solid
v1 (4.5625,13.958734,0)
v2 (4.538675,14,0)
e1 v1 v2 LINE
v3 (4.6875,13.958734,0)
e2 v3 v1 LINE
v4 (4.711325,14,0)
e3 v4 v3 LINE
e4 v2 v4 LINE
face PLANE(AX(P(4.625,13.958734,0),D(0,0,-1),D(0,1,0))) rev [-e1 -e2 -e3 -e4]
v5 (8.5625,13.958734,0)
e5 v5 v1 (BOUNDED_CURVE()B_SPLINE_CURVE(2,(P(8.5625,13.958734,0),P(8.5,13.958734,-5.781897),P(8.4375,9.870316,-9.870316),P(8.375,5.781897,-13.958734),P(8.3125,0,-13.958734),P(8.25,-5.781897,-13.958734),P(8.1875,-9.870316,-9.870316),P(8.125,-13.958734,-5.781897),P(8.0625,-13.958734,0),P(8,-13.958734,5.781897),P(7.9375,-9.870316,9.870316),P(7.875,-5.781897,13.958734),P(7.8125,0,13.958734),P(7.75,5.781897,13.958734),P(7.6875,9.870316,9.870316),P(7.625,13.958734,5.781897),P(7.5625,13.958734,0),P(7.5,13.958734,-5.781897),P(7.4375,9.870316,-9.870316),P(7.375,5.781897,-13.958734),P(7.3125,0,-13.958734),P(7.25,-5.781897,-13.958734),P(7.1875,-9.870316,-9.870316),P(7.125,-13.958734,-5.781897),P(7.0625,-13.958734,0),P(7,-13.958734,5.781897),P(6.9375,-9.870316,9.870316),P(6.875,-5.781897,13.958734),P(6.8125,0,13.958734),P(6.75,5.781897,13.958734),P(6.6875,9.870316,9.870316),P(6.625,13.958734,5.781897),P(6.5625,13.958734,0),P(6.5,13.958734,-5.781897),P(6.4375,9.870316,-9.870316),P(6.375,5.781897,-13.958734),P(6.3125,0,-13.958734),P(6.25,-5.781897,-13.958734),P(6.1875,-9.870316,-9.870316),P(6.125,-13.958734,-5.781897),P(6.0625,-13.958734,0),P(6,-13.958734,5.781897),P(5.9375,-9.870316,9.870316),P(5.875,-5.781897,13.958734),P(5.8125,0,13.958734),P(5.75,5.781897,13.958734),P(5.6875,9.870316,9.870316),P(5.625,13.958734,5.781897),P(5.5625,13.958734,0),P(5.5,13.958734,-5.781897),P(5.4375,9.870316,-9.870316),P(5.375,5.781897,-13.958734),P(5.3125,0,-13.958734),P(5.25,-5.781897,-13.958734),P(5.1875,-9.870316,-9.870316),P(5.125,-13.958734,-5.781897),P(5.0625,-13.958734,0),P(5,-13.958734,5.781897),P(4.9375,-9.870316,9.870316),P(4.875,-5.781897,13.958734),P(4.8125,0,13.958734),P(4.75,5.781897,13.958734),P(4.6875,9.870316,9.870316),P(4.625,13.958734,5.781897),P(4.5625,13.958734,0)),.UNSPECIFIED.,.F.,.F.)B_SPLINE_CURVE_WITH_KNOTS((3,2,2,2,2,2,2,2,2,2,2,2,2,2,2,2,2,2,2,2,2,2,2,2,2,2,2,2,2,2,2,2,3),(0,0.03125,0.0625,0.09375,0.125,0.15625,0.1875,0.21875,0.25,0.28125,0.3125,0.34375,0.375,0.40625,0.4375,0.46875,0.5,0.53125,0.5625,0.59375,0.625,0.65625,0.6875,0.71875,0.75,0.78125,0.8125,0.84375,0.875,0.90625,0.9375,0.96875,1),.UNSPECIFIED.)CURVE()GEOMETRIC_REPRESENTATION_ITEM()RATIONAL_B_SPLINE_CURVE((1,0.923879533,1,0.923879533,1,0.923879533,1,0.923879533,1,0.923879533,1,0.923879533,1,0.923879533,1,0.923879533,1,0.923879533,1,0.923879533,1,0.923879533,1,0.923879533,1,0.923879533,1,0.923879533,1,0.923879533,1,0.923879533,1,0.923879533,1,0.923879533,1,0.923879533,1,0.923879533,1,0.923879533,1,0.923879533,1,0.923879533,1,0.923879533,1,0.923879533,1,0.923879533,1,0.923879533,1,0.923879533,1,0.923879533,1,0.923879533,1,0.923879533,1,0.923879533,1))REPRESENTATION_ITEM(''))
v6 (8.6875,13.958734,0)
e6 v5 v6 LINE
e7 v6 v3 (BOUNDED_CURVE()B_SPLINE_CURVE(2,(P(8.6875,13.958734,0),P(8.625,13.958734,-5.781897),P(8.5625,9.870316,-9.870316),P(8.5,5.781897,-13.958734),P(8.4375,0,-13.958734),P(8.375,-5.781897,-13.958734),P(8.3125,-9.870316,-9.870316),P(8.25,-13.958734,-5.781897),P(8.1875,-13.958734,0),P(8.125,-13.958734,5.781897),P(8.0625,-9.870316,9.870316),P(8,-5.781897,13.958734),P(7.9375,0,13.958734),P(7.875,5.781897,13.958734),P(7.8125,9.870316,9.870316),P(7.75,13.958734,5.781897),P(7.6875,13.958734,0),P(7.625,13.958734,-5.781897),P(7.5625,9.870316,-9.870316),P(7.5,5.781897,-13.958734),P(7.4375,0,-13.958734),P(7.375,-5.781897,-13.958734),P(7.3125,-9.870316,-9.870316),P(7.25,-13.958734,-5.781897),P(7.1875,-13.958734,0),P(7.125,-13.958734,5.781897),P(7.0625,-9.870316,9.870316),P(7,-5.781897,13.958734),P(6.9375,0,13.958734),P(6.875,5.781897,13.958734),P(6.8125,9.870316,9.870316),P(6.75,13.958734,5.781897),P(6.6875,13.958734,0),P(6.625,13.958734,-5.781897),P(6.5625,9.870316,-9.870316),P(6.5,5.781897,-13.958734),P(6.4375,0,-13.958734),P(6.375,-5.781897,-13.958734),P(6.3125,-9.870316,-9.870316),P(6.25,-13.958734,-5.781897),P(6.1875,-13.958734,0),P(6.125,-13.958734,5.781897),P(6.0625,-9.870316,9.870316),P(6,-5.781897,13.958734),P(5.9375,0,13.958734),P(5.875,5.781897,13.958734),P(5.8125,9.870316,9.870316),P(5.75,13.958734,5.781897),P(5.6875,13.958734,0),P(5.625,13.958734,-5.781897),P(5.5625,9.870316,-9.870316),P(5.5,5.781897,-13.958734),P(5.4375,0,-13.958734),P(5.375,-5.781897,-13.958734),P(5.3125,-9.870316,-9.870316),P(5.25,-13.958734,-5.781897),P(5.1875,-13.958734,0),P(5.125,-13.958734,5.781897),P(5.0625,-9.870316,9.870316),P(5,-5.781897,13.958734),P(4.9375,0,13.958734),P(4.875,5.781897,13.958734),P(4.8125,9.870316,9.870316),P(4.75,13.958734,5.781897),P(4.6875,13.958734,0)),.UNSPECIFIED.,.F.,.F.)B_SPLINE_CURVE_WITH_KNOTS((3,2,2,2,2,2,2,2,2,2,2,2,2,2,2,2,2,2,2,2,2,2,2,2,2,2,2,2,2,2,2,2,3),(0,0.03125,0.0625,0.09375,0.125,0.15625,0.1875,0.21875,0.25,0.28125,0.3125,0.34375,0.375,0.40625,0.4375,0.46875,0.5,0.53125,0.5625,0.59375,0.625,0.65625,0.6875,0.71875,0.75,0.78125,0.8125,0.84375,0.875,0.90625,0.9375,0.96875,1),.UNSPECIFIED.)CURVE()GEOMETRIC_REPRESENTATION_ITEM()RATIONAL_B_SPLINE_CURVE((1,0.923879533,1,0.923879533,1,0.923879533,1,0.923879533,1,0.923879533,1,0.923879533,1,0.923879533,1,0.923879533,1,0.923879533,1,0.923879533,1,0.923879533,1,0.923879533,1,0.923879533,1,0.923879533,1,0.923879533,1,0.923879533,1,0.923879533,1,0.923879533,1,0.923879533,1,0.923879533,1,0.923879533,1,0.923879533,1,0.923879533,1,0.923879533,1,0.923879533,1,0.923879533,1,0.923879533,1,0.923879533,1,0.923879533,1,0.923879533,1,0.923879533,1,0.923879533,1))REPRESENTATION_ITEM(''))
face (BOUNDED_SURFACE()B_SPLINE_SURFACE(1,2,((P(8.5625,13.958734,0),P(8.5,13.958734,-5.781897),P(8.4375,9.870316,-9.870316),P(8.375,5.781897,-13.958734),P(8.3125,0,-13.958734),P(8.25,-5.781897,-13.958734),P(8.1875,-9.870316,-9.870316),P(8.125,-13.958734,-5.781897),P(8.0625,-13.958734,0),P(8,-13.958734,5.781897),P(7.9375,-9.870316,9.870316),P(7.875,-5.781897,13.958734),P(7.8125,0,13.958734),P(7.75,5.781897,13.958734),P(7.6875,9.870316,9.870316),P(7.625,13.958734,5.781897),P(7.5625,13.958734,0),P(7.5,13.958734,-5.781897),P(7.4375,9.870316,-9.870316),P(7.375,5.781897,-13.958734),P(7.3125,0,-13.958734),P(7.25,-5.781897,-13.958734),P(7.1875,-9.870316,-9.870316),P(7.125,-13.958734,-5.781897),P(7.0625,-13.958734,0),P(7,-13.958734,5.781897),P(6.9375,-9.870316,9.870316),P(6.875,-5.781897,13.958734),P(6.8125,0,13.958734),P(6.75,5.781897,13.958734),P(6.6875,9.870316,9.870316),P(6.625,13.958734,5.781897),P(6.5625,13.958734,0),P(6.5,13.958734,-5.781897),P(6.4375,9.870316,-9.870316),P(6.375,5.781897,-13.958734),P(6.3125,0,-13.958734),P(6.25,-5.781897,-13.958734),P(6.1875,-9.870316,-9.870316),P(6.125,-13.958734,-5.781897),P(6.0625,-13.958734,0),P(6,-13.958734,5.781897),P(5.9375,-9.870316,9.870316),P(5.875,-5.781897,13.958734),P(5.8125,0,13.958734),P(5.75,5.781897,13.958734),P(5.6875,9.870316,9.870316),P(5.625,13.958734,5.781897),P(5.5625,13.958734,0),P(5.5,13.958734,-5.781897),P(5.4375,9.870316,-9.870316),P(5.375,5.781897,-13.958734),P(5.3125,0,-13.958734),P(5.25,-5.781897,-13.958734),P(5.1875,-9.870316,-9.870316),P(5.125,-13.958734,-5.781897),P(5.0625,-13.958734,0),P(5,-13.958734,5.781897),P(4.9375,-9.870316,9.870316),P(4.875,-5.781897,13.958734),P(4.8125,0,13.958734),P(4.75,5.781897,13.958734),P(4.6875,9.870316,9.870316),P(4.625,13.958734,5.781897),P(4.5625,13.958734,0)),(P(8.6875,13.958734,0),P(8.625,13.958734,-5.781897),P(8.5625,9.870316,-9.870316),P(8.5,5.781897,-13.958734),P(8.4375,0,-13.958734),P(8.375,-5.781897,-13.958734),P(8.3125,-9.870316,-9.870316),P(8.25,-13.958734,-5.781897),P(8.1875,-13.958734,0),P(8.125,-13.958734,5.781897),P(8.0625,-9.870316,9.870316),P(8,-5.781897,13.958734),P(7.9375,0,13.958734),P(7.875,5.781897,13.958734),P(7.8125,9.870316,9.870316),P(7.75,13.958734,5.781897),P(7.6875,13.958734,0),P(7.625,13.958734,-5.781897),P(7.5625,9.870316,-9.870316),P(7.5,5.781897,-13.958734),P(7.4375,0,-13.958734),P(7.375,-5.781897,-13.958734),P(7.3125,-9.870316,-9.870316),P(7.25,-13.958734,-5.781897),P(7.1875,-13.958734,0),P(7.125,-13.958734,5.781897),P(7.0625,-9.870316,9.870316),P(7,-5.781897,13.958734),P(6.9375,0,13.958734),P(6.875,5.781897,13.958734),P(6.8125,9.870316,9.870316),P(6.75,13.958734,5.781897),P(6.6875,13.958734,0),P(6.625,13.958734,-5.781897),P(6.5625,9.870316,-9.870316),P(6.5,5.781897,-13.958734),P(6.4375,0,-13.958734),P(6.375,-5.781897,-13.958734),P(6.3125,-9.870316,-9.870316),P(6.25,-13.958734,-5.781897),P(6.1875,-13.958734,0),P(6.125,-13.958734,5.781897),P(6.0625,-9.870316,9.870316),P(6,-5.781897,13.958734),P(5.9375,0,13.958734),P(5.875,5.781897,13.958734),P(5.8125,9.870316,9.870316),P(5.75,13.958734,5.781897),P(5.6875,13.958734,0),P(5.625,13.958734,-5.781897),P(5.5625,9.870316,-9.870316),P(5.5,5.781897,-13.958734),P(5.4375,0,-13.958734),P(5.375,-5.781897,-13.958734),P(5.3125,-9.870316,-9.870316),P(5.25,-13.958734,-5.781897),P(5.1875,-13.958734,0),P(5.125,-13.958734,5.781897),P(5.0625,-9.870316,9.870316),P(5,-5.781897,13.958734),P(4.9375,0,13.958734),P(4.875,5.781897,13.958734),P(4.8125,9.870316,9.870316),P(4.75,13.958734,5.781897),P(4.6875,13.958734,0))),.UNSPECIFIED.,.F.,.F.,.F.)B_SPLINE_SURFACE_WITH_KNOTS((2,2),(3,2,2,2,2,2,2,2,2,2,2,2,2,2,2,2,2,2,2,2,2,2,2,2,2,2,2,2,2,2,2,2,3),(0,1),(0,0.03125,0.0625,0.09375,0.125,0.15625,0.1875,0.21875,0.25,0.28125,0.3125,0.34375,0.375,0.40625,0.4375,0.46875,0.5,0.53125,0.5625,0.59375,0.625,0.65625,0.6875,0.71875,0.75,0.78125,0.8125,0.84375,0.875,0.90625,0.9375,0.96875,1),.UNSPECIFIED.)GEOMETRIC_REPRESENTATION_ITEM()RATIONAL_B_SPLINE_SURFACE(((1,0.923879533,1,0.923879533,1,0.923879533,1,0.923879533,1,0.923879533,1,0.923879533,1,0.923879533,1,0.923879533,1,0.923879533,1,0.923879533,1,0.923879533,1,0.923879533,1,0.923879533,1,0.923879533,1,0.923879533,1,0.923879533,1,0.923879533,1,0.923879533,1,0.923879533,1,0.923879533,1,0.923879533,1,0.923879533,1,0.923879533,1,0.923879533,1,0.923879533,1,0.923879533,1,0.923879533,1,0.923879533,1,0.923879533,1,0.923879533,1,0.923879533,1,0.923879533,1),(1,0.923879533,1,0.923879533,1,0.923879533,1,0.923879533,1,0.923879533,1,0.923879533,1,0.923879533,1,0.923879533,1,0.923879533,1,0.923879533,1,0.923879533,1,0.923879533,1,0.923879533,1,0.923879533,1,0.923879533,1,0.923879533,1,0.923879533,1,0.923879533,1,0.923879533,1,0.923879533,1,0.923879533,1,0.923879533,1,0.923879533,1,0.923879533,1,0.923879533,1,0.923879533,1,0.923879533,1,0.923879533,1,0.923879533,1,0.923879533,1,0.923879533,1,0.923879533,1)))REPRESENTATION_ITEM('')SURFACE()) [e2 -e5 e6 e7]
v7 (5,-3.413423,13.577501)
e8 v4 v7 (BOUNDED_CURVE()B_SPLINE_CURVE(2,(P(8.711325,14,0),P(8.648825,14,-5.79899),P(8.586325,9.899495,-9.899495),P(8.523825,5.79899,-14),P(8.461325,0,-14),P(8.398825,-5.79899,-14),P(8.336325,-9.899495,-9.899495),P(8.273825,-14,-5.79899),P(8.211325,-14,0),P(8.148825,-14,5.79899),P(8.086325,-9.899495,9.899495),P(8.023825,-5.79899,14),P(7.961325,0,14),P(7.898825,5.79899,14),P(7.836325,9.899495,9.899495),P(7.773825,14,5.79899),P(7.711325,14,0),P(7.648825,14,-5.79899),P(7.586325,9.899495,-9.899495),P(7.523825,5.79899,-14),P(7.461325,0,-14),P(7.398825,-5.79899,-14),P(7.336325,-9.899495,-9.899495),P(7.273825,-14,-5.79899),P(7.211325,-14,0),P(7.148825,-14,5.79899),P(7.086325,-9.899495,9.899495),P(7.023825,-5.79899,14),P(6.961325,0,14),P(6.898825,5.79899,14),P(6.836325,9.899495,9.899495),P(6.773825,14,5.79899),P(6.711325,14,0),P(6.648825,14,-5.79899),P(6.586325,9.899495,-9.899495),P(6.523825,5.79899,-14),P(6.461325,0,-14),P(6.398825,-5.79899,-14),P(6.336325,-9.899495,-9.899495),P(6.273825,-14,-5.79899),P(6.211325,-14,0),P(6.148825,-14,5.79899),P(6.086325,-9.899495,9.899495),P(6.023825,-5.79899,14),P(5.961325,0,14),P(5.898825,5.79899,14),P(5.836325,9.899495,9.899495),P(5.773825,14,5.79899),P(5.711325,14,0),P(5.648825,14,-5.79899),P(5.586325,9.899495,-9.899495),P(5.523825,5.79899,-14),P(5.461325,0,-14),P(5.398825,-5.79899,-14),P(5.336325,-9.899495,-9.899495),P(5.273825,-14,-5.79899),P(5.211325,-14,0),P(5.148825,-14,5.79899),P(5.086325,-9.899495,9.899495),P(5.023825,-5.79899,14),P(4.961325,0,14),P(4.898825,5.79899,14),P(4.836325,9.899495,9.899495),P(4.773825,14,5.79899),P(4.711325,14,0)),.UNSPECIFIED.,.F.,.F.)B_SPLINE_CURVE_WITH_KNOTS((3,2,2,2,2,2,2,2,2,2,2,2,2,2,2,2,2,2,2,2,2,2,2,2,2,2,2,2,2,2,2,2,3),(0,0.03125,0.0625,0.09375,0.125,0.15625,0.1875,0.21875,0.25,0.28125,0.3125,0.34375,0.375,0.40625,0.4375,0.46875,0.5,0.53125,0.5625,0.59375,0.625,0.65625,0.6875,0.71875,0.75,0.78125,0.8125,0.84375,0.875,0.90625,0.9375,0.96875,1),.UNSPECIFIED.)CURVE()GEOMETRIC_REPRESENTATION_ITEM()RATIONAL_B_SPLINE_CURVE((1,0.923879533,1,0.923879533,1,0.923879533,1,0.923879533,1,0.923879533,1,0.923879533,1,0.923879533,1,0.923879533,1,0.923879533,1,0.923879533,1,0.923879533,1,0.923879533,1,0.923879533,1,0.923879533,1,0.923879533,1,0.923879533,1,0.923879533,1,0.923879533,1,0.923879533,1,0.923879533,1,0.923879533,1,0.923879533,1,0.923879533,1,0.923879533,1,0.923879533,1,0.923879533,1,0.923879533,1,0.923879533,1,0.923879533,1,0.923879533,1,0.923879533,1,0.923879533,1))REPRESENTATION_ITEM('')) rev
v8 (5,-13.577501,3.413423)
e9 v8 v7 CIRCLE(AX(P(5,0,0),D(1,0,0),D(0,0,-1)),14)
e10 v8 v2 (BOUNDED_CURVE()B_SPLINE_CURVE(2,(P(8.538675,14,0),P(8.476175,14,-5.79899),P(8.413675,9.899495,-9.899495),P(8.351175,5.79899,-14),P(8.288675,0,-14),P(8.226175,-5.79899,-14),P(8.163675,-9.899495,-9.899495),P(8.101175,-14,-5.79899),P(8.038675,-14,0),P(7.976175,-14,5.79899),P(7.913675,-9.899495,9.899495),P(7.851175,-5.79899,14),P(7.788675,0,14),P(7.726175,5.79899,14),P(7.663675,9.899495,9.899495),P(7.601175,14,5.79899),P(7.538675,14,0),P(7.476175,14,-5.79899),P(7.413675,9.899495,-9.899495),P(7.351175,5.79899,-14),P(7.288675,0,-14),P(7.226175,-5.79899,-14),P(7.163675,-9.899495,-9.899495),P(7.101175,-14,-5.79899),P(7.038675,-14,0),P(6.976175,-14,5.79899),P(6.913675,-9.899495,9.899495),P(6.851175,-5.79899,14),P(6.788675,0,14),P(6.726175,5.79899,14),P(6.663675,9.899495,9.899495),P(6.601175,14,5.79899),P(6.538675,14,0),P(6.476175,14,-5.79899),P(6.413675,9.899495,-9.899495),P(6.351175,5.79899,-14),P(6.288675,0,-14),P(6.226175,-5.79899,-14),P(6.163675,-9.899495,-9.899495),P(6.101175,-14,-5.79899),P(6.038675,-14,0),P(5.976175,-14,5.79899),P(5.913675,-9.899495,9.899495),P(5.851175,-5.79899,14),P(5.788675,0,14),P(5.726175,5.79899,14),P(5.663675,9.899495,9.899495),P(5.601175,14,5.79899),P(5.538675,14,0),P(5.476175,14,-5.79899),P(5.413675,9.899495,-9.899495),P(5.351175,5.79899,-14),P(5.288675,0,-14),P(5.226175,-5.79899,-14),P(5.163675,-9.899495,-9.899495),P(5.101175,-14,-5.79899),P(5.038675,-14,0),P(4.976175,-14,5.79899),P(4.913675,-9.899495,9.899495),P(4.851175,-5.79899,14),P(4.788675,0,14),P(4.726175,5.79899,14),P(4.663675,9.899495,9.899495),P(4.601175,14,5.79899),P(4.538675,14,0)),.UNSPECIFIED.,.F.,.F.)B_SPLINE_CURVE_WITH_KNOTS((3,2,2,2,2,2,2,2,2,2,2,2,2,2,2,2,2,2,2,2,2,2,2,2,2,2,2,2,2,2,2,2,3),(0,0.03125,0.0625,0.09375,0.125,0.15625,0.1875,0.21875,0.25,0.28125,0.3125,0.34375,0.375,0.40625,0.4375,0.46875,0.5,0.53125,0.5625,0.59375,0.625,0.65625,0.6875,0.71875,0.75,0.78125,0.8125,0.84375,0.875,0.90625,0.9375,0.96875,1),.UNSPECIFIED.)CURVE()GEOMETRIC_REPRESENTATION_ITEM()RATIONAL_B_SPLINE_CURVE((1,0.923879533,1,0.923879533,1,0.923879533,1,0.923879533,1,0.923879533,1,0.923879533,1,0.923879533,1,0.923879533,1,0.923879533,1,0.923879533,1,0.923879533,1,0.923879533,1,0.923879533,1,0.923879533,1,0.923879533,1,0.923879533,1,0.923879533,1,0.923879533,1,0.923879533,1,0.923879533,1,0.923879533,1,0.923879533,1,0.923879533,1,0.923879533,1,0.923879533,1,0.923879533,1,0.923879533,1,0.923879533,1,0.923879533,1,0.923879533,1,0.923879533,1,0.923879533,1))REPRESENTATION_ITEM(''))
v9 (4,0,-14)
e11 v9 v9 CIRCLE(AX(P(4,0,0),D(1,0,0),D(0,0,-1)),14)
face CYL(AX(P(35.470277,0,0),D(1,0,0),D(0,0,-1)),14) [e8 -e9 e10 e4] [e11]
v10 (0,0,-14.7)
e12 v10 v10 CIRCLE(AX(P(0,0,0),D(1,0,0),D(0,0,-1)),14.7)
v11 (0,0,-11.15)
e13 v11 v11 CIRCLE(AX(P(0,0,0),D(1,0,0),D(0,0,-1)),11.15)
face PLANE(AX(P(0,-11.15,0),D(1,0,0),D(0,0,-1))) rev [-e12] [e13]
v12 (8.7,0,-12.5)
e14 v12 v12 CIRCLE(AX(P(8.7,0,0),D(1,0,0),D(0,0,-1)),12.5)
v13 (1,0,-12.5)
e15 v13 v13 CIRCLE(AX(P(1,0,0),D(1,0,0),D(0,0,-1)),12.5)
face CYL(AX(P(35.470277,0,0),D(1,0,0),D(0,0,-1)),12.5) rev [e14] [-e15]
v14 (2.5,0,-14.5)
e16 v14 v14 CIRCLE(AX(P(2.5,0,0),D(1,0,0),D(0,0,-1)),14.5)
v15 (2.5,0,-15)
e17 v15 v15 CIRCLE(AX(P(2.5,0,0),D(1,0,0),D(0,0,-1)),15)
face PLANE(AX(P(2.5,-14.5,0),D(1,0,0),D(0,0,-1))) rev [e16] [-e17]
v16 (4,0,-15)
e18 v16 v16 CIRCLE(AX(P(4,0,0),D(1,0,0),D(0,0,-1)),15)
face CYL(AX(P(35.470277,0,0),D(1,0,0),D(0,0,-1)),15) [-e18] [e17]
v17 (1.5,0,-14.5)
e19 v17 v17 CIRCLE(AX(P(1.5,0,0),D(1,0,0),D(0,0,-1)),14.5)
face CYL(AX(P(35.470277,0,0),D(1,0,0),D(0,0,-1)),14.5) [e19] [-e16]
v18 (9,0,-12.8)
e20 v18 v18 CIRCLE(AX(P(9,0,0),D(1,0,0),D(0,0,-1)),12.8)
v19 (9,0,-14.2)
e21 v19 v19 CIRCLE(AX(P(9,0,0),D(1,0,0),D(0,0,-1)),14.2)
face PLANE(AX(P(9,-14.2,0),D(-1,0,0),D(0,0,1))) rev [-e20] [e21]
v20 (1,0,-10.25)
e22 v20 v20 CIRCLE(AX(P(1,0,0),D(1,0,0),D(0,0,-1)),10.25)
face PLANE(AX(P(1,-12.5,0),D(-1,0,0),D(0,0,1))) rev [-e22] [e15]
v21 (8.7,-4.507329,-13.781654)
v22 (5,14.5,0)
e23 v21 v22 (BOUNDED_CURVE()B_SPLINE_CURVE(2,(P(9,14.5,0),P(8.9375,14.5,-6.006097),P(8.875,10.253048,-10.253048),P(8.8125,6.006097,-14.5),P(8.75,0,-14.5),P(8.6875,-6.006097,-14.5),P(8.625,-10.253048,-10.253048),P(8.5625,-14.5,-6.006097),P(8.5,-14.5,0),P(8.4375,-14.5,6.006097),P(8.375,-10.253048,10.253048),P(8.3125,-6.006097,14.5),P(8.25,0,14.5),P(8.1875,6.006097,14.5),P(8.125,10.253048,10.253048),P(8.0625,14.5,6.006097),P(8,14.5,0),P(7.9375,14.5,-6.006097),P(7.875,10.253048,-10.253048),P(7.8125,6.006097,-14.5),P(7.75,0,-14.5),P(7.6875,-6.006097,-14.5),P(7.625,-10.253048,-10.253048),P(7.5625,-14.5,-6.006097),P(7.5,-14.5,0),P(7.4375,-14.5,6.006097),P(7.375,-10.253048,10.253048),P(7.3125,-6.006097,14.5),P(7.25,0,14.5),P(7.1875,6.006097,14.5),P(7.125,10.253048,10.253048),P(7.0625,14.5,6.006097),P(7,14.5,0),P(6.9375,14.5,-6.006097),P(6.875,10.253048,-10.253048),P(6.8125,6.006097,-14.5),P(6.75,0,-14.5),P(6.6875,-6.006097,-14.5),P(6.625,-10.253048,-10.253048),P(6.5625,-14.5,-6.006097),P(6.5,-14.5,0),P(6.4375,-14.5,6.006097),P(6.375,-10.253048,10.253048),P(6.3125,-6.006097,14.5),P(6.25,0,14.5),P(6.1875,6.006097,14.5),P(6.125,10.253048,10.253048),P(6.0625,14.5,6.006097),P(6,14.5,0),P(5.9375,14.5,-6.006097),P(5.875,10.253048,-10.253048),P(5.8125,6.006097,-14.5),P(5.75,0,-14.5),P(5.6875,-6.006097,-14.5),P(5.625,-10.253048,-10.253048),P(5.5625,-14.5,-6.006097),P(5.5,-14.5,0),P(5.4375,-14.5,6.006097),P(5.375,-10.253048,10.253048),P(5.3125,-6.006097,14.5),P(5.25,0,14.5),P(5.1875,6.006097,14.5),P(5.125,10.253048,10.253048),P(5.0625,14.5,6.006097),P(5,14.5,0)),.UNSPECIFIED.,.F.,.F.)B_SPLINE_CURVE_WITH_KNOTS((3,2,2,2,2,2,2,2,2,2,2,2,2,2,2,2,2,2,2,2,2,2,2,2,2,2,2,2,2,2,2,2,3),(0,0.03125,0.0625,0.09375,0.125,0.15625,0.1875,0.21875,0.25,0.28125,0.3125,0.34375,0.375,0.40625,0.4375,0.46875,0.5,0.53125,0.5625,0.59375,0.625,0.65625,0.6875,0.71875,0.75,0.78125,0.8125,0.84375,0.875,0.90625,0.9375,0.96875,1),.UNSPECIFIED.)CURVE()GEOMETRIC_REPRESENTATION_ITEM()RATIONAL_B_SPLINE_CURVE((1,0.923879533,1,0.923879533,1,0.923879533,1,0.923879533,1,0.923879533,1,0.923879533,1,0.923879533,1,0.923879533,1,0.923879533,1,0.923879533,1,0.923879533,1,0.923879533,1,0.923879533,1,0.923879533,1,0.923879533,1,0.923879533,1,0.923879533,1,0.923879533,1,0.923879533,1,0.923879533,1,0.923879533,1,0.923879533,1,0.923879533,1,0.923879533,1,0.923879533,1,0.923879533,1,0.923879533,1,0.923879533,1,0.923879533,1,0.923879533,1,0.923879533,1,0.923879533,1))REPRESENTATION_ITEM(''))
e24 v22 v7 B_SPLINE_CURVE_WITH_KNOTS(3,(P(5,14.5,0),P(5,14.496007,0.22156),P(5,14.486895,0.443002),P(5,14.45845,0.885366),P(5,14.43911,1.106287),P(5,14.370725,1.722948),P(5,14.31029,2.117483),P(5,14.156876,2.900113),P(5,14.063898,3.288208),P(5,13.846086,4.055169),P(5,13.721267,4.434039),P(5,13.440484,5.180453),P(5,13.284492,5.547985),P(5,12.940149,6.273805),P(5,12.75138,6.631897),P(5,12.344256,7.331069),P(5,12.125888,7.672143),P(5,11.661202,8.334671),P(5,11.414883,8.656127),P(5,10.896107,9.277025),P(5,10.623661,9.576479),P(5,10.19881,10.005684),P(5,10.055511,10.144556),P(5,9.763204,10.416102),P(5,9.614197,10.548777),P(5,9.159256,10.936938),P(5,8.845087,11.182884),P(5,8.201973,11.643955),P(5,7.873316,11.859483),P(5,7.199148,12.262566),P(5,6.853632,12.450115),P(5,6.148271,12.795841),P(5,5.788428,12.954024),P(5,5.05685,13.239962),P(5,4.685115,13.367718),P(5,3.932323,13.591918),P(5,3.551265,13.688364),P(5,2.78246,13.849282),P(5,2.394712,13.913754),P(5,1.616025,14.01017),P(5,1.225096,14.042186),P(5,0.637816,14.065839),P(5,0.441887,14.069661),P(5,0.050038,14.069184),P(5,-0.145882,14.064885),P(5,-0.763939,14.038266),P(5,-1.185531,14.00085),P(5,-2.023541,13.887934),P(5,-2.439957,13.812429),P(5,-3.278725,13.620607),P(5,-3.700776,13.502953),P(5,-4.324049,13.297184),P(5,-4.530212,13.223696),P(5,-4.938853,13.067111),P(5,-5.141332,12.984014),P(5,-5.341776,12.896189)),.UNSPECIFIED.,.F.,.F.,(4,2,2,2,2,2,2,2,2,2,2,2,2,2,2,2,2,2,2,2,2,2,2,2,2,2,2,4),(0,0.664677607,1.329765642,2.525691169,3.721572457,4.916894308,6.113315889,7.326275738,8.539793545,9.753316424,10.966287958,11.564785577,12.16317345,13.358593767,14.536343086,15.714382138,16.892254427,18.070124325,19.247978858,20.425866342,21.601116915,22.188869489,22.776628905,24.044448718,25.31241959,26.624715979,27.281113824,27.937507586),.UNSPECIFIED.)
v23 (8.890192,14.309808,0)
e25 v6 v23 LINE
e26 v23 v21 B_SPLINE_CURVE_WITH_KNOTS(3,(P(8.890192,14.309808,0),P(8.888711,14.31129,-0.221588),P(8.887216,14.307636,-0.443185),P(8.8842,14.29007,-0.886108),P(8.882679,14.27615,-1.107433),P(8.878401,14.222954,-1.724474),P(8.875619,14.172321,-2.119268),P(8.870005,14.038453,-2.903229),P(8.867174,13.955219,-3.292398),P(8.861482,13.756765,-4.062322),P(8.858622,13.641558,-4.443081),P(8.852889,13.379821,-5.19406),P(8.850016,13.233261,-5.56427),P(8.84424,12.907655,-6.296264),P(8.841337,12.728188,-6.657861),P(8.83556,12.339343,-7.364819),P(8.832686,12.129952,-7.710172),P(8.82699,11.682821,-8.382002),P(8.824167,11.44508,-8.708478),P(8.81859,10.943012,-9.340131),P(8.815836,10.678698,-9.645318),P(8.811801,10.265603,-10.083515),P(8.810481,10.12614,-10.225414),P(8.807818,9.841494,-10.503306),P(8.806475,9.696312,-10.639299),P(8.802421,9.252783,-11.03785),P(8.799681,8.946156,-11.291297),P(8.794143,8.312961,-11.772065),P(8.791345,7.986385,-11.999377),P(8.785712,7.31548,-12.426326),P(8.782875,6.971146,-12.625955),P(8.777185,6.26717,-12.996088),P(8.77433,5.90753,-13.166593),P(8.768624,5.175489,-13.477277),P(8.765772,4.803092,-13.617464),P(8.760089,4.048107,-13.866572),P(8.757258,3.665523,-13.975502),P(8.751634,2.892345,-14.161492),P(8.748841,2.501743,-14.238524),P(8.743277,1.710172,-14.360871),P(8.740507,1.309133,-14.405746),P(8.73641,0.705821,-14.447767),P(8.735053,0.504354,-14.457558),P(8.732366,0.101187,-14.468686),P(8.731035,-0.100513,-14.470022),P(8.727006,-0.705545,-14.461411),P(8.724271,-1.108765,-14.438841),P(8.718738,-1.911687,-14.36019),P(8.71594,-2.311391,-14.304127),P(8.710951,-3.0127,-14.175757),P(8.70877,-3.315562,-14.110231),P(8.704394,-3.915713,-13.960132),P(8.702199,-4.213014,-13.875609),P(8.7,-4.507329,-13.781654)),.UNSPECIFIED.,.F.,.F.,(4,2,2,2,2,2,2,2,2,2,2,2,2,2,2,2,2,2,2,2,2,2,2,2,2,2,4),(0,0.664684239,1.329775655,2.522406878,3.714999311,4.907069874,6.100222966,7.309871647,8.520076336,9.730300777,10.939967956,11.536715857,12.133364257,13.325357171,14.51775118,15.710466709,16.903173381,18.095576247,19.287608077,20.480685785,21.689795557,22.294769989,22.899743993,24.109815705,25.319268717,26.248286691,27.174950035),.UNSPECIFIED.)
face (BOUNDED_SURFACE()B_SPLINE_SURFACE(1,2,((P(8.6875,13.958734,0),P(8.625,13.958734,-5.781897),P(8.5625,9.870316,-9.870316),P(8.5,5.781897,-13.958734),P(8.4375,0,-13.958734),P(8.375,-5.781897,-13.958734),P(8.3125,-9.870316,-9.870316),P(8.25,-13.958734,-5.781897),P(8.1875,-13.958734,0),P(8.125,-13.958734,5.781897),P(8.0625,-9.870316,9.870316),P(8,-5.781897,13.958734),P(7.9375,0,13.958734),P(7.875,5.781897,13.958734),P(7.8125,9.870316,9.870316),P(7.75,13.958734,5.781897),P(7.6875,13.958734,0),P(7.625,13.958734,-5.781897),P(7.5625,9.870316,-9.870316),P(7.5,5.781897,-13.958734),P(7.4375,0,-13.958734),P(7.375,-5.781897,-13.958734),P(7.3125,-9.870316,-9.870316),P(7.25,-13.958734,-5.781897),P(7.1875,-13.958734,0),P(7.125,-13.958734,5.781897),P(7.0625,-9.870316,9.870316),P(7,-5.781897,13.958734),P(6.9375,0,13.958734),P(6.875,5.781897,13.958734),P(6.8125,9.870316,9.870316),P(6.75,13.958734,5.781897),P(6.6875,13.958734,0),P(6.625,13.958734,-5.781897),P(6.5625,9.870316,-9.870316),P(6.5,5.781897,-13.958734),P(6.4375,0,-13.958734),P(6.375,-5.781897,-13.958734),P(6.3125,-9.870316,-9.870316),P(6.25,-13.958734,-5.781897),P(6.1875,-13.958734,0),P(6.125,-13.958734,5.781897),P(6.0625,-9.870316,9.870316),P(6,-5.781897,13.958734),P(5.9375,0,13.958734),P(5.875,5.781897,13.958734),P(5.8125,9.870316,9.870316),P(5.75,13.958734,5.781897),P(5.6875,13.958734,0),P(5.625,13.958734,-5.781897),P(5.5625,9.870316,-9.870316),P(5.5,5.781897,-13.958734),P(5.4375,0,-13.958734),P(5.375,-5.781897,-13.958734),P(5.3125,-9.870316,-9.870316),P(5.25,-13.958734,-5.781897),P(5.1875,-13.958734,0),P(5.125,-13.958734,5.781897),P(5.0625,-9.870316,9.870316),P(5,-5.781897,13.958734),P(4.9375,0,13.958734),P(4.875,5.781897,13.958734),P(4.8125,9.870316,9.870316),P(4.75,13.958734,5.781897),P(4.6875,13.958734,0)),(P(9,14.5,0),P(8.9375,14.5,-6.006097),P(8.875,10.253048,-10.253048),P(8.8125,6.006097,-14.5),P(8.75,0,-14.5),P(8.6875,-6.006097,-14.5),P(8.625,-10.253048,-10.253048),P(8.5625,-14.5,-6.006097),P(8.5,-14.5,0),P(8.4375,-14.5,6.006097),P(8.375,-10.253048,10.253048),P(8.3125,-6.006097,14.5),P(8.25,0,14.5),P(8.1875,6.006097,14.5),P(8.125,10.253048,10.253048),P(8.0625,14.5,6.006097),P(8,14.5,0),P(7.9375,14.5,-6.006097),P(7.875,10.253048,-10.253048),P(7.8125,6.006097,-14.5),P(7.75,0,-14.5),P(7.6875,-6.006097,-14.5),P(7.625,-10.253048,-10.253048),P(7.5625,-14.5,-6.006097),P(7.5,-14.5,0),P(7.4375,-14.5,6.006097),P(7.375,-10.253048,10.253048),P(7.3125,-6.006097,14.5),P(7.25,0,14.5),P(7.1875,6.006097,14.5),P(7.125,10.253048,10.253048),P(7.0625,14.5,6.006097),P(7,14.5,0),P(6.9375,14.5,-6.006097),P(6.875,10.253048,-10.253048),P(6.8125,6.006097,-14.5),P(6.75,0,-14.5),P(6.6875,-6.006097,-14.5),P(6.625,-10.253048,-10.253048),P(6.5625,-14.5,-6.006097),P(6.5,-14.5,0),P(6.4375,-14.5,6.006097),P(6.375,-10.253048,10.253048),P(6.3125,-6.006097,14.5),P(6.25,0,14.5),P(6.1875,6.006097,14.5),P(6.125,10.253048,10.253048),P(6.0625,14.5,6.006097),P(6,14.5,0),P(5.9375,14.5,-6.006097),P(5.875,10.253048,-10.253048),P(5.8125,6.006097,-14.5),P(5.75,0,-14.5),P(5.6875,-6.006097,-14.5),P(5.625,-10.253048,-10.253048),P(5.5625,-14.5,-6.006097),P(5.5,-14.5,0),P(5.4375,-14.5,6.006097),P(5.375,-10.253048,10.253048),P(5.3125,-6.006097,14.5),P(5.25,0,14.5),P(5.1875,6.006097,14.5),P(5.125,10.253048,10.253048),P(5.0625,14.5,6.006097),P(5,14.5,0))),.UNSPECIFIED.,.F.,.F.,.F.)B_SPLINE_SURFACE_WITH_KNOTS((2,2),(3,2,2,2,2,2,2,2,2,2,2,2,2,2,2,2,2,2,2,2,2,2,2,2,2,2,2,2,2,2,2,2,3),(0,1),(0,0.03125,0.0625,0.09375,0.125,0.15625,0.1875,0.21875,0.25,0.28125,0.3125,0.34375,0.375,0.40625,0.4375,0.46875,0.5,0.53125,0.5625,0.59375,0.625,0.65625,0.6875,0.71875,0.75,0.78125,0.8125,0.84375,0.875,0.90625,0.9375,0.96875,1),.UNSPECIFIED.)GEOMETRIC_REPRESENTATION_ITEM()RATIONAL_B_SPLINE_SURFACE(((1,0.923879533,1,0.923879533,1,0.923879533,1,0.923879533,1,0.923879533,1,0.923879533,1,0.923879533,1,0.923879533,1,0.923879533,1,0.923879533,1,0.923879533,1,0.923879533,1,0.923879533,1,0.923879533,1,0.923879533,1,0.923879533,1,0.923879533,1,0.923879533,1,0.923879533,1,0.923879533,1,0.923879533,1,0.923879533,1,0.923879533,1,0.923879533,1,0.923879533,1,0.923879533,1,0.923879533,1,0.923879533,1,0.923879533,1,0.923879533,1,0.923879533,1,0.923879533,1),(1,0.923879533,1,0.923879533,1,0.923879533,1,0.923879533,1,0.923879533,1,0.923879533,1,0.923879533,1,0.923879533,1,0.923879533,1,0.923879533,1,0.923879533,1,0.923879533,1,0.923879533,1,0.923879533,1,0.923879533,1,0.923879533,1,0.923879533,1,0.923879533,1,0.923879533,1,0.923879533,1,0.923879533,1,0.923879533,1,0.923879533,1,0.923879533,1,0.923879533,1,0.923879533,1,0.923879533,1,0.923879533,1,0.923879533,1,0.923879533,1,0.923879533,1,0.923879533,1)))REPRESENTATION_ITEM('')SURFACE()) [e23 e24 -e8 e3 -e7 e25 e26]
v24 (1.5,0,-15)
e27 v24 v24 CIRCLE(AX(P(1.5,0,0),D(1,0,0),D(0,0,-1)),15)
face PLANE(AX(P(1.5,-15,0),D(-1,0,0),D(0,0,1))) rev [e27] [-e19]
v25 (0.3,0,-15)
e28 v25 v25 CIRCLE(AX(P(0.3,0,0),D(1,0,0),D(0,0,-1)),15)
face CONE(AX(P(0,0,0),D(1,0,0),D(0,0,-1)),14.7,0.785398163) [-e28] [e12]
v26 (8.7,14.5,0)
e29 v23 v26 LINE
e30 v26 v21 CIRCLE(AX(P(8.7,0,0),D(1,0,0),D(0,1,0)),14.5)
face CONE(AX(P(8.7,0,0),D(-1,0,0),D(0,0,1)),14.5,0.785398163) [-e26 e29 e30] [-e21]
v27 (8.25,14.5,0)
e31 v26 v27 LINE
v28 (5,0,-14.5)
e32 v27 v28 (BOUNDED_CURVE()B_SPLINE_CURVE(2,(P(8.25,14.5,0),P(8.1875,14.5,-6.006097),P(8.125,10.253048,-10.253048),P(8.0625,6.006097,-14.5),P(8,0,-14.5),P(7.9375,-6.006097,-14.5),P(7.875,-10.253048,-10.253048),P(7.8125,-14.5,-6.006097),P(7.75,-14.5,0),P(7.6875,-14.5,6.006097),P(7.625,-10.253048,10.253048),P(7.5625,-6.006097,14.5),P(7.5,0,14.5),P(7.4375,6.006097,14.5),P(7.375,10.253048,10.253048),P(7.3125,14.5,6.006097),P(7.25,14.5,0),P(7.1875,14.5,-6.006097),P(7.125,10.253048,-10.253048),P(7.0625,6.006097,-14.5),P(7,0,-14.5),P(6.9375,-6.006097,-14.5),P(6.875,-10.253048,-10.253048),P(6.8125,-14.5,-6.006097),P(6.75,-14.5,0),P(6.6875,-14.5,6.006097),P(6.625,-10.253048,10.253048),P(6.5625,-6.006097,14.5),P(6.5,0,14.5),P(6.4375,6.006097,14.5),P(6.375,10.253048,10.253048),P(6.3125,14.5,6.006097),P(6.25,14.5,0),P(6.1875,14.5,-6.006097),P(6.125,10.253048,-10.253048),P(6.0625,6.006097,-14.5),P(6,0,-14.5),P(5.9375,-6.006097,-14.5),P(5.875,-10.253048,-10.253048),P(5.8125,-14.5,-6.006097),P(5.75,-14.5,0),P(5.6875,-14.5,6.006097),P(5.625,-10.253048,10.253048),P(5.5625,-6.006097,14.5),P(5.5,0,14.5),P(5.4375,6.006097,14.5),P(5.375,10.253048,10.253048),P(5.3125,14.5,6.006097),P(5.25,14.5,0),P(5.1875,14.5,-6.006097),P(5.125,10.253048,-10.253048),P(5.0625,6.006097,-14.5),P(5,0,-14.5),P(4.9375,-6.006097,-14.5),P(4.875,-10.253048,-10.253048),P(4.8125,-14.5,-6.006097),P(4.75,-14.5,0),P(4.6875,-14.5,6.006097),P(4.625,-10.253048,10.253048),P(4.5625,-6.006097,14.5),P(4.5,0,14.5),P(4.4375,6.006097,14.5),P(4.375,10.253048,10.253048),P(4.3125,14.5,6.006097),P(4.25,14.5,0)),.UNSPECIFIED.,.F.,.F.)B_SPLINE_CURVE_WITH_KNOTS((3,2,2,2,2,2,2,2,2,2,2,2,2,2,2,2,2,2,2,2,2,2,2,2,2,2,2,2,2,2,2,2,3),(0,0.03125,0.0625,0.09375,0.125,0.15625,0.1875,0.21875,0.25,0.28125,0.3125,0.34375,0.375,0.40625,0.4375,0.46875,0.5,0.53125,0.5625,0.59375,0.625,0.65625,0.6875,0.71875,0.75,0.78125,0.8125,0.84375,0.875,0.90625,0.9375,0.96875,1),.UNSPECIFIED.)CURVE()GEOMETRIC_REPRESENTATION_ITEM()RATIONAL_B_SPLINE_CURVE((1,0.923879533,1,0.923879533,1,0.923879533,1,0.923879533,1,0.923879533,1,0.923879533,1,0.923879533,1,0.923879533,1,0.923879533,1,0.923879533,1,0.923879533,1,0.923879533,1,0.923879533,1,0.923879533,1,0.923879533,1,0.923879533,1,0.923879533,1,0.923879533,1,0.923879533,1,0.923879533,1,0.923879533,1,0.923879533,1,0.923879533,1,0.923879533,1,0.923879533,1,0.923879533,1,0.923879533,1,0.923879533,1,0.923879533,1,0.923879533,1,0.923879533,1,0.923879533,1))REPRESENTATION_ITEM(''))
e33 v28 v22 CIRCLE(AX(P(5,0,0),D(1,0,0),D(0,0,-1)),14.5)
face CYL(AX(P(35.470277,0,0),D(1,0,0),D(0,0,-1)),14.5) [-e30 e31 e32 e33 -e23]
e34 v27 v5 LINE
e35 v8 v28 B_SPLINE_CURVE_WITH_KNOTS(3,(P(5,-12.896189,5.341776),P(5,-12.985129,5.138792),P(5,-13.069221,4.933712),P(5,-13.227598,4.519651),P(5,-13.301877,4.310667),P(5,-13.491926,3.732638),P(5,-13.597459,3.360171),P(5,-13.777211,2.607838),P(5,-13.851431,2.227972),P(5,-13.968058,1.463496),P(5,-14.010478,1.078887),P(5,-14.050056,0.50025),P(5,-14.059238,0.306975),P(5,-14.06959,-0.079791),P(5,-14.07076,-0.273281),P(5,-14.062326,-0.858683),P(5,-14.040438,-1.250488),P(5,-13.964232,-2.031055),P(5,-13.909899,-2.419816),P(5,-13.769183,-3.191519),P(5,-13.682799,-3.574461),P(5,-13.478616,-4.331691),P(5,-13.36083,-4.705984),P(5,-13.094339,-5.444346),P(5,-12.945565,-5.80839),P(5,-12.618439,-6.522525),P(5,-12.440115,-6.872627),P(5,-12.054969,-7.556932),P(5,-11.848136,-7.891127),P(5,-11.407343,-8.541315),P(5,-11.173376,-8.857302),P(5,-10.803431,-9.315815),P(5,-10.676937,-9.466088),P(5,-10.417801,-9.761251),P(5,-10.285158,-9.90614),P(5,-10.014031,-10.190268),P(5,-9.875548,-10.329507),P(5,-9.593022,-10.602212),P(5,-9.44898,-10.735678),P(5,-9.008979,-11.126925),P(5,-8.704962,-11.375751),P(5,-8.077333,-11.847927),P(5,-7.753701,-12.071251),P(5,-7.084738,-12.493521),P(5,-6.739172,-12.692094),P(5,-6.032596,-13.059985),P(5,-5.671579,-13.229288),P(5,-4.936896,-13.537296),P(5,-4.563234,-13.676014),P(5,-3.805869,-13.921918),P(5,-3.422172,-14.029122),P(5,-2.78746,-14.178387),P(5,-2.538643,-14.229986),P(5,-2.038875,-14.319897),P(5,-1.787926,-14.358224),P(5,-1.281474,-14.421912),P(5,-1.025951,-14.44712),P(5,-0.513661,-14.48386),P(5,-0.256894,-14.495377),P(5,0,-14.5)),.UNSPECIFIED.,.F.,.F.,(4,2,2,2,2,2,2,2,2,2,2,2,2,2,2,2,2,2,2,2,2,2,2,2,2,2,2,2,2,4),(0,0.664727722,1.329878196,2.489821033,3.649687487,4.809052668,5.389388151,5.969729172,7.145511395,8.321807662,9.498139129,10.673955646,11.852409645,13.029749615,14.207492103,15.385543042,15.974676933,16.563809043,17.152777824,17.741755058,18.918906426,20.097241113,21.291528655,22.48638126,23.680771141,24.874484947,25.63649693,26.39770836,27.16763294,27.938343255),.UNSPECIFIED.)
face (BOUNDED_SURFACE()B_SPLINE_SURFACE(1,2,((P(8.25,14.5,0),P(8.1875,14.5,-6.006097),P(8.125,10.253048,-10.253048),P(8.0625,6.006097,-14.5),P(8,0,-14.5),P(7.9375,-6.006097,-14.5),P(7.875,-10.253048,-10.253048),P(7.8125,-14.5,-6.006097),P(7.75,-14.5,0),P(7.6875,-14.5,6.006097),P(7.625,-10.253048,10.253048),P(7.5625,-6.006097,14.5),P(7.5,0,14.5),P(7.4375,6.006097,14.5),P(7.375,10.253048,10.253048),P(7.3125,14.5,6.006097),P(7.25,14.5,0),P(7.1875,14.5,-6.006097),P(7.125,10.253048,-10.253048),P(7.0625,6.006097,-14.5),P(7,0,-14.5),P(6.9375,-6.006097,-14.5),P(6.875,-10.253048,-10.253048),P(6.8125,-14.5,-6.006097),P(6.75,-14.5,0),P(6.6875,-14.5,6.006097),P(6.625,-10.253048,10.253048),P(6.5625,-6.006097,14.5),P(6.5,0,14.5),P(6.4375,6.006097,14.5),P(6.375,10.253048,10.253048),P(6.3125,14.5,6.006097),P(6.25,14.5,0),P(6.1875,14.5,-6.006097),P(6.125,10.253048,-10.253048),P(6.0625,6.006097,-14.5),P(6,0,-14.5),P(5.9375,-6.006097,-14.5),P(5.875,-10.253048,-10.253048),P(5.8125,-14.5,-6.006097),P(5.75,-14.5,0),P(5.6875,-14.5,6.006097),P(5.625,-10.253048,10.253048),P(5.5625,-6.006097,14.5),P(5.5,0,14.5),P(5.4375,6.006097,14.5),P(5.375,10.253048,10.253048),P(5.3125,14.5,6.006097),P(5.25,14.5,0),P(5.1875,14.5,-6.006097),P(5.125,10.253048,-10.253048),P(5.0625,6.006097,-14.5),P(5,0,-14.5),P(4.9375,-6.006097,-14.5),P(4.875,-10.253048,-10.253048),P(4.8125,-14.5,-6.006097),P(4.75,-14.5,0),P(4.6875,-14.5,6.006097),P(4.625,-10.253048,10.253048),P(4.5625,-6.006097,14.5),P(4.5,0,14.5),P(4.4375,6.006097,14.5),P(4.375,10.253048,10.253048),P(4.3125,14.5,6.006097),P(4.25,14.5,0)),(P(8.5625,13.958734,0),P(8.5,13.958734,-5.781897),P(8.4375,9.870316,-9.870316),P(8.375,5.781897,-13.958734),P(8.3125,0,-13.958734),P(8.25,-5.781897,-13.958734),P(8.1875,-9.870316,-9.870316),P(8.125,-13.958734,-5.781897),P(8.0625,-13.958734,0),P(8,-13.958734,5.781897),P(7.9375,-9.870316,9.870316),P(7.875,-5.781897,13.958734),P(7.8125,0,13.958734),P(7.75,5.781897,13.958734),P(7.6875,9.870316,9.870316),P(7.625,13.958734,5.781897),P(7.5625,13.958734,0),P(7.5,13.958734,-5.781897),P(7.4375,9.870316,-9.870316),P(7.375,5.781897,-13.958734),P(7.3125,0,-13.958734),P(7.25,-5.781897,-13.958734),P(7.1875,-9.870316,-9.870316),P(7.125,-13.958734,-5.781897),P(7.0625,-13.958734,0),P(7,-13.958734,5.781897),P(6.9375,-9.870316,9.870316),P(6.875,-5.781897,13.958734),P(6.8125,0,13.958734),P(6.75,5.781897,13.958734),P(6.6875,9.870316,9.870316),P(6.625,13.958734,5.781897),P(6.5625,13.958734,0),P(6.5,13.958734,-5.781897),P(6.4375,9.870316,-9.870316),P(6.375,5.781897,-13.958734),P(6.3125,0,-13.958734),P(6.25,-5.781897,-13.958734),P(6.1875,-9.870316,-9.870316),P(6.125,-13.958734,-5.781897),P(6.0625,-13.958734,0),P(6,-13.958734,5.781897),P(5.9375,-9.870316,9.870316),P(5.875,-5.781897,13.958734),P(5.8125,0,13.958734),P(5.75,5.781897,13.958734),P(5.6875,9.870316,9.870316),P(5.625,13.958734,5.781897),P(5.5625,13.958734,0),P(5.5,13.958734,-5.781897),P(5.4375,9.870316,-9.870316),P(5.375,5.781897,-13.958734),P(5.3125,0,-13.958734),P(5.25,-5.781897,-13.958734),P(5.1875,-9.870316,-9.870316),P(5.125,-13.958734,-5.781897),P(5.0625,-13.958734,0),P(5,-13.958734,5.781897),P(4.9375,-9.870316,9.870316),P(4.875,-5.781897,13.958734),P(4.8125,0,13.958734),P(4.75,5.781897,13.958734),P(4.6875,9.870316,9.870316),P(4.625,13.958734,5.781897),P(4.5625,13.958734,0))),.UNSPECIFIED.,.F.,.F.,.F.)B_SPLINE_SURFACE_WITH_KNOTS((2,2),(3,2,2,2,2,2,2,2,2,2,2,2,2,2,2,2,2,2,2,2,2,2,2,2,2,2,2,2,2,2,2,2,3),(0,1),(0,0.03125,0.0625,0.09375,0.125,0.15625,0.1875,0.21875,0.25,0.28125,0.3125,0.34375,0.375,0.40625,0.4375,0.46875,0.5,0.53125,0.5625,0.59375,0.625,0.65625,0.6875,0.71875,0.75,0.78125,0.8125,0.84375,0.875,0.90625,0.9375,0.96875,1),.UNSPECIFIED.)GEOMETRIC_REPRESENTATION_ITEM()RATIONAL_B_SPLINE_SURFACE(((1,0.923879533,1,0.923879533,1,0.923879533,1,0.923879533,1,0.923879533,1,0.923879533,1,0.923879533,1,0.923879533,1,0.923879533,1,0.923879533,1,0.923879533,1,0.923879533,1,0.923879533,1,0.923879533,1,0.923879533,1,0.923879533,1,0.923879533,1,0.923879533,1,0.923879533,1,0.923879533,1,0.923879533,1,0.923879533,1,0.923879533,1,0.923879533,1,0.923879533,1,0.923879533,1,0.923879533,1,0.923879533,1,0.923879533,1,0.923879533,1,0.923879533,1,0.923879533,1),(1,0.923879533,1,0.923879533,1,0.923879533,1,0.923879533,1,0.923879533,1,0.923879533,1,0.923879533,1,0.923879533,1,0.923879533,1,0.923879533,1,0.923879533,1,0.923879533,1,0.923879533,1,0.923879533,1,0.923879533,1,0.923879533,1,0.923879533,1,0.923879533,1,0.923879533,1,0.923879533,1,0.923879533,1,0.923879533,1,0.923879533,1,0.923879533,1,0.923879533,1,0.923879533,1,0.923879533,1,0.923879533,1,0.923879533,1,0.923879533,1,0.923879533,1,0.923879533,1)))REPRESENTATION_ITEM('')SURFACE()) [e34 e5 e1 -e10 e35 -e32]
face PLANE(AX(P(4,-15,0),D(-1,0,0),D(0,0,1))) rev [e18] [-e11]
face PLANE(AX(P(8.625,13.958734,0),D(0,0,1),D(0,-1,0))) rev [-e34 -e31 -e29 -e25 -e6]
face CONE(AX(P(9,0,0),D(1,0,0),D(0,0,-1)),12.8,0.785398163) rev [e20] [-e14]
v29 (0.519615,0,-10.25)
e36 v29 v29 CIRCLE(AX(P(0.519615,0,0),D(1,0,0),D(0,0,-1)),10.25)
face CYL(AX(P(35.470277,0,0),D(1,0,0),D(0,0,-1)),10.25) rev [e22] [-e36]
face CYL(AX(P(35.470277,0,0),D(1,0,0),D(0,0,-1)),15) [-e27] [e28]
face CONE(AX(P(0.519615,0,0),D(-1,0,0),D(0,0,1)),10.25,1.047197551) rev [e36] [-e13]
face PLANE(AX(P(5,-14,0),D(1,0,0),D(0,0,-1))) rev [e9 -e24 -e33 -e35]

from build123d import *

# Parameters (mm, degrees)
THREAD2_PITCH = 1


with BuildPart() as part:
    # Sketch1 → Revolve1 (revolve)
    with BuildSketch(Plane.XY, mode=Mode.PRIVATE) as revolve1_sk:
        Polygon((0, -11.15), (0, -14.7), (0.3, -15), (1.5, -15), (1.5, -14.5), (2.5, -14.5), (2.5, -15), (4, -15), (4, -14), (5, -14), (5, -14.5), (8.7, -14.5), (9, -14.2), (9, -12.8), (8.7, -12.5), (1, -12.5), (1, -10.25), (0.519615242, -10.25), align=None)
    revolve(revolve1_sk.sketch.rotate(Axis((35.470277062, 0, 0), (-1, 0, 0)), 270), axis=Axis((35.470277062, 0, 0), (-1, 0, 0)))

    # Thread2: the profile of Thread Profile2 profile screwed along a right-hand helix of 4 turns, 8 arcs to a turn; built about Z, then put on its axis
    thread2_z = Axis((0, 0, 0), (0, 0, 1))
    thread2_corners = [(14.5003, 0, 0.750173208), (13.95873412, 0, 0.437500002), (13.95873412, 0, 0.312500002), (14.5003, 0, -0.000173205)]
    with BuildLine(mode=Mode.PRIVATE) as thread2_profile:
        Line(thread2_corners[0], thread2_corners[1])
        Line(thread2_corners[1], thread2_corners[2])
        Line(thread2_corners[2], thread2_corners[3])
        Line(thread2_corners[3], thread2_corners[0])
    thread2_cap = Face(thread2_profile.wire())
    thread2_turn_angles = [0, 22.5, 45, 67.5, 90, 112.5, 135, 157.5, 180, 202.5, 225, 247.5, 270, 292.5, 315, 337.5, 360]
    thread2_turn_weights = [1, 0.9238795325112867, 1, 0.9238795325112867, 1, 0.9238795325112867, 1, 0.9238795325112867, 1, 0.9238795325112867, 1, 0.9238795325112867, 1, 0.9238795325112867, 1, 0.9238795325112867, 1]
    thread2_turn_rails = [Edge.make_bspline([Vector(p[0], p[1], 0).rotate(thread2_z, thread2_turn_angles[k]) / thread2_turn_weights[k] + Vector(0, 0, p[2] + THREAD2_PITCH * thread2_turn_angles[k] / 360) for k in range(17)], [0, 0, 0, 1, 1, 2, 2, 3, 3, 4, 4, 5, 5, 6, 6, 7, 7, 8, 8, 8], 2, thread2_turn_weights) for p in thread2_corners]
    thread2_turn_sides = [Face.make_surface_from_curves(thread2_turn_rails[p[0]], thread2_turn_rails[p[1]]) for p in [(0, 1), (1, 2), (2, 3), (3, 0)]]
    thread2 = Plane(origin=(9, 0, 0), x_dir=(0, 1, 0), z_dir=(-1, 0, 0)) * Solid(Shell([*[p.moved(Location((0, 0, THREAD2_PITCH * i))) for i in range(4) for p in thread2_turn_sides], thread2_cap, thread2_cap.rotate(thread2_z, 1440).moved(Location((0, 0, THREAD2_PITCH * 1440 / 360)))]))
    add(thread2, mode=Mode.SUBTRACT)


solid = part.part
